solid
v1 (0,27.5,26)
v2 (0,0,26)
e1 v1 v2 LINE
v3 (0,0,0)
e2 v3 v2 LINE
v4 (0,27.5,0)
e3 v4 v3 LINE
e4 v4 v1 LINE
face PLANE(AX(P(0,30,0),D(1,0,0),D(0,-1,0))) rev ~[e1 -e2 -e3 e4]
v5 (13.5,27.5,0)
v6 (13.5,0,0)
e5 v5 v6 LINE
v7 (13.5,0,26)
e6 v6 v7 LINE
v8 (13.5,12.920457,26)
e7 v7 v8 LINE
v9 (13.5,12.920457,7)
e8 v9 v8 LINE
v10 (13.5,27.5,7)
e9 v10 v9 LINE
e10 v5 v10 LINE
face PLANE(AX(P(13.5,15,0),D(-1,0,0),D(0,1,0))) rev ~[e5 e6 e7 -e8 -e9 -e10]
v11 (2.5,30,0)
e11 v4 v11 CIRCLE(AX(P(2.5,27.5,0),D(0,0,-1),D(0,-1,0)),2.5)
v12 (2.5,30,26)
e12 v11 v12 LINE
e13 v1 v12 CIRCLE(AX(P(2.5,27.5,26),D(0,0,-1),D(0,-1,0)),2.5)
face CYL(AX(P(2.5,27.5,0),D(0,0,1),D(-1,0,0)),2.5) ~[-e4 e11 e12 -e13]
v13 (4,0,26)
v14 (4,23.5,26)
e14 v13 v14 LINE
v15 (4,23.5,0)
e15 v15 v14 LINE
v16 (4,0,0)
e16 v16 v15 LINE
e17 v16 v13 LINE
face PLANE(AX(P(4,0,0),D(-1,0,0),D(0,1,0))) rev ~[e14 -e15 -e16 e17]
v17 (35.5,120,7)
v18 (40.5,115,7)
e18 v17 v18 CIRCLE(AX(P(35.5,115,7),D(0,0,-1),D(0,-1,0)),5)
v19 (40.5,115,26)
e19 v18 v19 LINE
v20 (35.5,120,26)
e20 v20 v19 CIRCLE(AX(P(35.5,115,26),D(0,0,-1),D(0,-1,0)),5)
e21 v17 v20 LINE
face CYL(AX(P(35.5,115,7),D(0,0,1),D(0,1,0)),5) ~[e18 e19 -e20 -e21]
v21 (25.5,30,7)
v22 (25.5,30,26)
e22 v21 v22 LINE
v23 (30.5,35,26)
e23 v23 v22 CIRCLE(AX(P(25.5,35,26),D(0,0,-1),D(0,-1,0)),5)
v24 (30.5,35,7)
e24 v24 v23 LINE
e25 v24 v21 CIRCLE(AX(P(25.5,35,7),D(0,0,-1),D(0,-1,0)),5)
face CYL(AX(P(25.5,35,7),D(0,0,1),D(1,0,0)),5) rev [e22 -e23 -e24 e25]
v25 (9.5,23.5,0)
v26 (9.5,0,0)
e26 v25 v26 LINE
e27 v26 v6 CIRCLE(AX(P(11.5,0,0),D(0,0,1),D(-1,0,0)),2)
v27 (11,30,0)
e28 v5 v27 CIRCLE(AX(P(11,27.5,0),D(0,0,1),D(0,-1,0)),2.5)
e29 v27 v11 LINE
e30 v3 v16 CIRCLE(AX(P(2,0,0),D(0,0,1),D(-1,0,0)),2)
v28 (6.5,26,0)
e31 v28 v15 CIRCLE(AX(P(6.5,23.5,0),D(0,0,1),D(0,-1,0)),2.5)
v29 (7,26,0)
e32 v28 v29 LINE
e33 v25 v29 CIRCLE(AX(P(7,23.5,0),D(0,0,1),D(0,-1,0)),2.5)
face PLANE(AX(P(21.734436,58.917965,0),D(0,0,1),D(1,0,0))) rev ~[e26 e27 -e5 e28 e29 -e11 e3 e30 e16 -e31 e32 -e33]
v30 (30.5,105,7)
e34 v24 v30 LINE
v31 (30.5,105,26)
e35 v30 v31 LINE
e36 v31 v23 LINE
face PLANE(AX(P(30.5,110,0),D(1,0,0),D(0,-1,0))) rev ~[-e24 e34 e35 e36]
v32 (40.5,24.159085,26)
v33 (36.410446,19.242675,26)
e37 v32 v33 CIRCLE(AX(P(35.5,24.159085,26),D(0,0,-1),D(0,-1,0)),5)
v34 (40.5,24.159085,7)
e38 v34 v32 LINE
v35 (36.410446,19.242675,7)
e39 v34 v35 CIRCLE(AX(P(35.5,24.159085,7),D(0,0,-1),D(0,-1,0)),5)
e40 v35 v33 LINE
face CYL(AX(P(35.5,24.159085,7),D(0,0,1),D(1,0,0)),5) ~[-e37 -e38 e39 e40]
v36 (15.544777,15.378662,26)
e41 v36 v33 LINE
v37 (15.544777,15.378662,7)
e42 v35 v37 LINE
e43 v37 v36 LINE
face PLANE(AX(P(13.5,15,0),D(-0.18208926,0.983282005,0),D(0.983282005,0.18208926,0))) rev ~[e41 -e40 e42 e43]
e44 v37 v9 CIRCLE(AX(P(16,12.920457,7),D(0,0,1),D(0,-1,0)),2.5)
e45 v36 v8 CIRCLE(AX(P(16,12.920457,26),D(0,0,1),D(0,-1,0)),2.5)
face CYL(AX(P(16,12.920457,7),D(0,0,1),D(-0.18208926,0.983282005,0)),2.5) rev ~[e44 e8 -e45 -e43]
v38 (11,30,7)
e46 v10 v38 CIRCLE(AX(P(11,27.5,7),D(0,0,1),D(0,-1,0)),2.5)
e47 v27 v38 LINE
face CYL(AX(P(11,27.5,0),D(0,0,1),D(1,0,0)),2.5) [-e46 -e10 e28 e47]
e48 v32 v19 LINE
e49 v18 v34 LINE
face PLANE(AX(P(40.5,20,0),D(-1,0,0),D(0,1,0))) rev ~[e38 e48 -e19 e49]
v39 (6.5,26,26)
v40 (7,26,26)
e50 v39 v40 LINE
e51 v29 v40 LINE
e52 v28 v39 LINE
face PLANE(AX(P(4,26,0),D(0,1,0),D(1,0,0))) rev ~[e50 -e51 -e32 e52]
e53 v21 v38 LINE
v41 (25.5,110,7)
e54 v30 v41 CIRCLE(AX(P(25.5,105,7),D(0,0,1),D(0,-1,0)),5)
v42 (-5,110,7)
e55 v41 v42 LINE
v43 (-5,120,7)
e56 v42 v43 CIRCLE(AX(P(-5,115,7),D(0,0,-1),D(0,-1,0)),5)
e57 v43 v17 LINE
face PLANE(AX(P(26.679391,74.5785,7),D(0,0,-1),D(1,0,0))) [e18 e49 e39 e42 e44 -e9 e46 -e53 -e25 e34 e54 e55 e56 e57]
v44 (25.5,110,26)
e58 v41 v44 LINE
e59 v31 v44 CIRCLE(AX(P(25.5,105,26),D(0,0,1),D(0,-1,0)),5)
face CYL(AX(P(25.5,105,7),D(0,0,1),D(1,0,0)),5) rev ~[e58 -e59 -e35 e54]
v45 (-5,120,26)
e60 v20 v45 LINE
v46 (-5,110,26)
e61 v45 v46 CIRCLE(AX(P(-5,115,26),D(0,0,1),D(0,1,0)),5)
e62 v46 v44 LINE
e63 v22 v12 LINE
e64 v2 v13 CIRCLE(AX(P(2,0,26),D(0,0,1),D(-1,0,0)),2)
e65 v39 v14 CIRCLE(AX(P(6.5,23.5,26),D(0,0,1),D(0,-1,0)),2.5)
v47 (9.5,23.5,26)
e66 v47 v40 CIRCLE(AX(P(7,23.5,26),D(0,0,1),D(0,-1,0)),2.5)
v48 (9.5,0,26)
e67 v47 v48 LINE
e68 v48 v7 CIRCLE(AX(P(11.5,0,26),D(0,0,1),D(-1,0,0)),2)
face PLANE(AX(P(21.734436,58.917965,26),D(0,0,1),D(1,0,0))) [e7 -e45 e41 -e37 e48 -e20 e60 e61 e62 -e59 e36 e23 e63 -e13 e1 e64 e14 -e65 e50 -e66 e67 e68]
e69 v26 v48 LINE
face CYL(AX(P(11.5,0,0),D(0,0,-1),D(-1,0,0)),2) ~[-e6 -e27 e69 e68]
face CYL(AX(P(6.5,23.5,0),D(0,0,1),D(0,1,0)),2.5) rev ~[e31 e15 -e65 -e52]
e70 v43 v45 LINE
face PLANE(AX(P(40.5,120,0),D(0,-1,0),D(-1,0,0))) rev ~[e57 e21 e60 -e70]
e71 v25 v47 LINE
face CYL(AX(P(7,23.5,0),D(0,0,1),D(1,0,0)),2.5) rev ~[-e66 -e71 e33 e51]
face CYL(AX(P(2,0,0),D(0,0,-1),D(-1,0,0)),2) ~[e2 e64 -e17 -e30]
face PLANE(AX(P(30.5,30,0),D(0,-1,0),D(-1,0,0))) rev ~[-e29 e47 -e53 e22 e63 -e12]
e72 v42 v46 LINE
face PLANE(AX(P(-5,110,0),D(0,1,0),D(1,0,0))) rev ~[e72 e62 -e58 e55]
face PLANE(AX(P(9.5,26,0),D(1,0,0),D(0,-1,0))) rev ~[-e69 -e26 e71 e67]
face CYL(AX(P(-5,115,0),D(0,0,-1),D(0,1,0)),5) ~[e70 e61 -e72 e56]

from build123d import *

# Parameters (mm, degrees)
F1_DEPTH = 26
F3_DEPTH = 7
F4_R     = 5
F5_R     = 2.5


with BuildPart() as f1:
    # F0 (on Top) → F1 (new body)
    with BuildSketch(Plane.XY):
        Polygon((0, 30), (0, 0), (4, 0), (4, 26), (9.5, 26), (9.5, 0), (13.5, 0), (13.5, 15), (40.5, 20), (40.5, 120), (30.5, 120), (-5, 120), (-5, 110), (30.5, 110), (30.5, 30), align=None)
        with BuildLine():
            Line((4, 0), (0, 0))
            ThreePointArc((0, 0), (2, -2), (4, 0))
        make_face()
        with BuildLine():
            ThreePointArc((-5, 120), (-10, 115), (-5, 110))
            Line((-5, 110), (-5, 120))
        make_face()
        with BuildLine():
            Line((13.5, 0), (9.5, 0))
            ThreePointArc((9.5, 0), (11.5, -2), (13.5, 0))
        make_face()
    extrude(amount=F1_DEPTH)

    # F2 (on face) → F3 (cut)
    with BuildSketch(Plane(origin=(0, 0, 0), x_dir=(1, 0, 0), z_dir=(0, 0, -1))):
        with BuildLine():
            Line((13.5, -30), (30.5, -30))
            Line((30.5, -30), (30.5, -110))
            Line((30.5, -110), (-5, -110))
            ThreePointArc((-5, -110), (-10, -115), (-5, -120))
            Line((-5, -120), (13.5, -120))
            Line((13.5, -120), (40.5, -120))
            Line((40.5, -120), (40.5, -20))
            Line((40.5, -20), (13.5, -15))
            Line((13.5, -15), (13.5, -30))
        make_face()
    extrude(amount=-F3_DEPTH, mode=Mode.SUBTRACT)

    # F4
    f4_edges = [f1.edges().sort_by_distance(p)[0] for p in [
        (40.5, 120, 16.5),
        (30.5, 110, 16.5),
        (30.5, 30, 16.5),
        (40.5, 20, 16.5),
    ]]
    fillet(f4_edges, radius=F4_R)

    # F5
    f5_edges = [f1.edges().sort_by_distance(p)[0] for p in [
        (0, 30, 13),
        (4, 26, 13),
        (9.5, 26, 13),
        (13.5, 15, 16.5),
        (13.5, 30, 3.5),
    ]]
    fillet(f5_edges, radius=F5_R)


solid = f1.part
